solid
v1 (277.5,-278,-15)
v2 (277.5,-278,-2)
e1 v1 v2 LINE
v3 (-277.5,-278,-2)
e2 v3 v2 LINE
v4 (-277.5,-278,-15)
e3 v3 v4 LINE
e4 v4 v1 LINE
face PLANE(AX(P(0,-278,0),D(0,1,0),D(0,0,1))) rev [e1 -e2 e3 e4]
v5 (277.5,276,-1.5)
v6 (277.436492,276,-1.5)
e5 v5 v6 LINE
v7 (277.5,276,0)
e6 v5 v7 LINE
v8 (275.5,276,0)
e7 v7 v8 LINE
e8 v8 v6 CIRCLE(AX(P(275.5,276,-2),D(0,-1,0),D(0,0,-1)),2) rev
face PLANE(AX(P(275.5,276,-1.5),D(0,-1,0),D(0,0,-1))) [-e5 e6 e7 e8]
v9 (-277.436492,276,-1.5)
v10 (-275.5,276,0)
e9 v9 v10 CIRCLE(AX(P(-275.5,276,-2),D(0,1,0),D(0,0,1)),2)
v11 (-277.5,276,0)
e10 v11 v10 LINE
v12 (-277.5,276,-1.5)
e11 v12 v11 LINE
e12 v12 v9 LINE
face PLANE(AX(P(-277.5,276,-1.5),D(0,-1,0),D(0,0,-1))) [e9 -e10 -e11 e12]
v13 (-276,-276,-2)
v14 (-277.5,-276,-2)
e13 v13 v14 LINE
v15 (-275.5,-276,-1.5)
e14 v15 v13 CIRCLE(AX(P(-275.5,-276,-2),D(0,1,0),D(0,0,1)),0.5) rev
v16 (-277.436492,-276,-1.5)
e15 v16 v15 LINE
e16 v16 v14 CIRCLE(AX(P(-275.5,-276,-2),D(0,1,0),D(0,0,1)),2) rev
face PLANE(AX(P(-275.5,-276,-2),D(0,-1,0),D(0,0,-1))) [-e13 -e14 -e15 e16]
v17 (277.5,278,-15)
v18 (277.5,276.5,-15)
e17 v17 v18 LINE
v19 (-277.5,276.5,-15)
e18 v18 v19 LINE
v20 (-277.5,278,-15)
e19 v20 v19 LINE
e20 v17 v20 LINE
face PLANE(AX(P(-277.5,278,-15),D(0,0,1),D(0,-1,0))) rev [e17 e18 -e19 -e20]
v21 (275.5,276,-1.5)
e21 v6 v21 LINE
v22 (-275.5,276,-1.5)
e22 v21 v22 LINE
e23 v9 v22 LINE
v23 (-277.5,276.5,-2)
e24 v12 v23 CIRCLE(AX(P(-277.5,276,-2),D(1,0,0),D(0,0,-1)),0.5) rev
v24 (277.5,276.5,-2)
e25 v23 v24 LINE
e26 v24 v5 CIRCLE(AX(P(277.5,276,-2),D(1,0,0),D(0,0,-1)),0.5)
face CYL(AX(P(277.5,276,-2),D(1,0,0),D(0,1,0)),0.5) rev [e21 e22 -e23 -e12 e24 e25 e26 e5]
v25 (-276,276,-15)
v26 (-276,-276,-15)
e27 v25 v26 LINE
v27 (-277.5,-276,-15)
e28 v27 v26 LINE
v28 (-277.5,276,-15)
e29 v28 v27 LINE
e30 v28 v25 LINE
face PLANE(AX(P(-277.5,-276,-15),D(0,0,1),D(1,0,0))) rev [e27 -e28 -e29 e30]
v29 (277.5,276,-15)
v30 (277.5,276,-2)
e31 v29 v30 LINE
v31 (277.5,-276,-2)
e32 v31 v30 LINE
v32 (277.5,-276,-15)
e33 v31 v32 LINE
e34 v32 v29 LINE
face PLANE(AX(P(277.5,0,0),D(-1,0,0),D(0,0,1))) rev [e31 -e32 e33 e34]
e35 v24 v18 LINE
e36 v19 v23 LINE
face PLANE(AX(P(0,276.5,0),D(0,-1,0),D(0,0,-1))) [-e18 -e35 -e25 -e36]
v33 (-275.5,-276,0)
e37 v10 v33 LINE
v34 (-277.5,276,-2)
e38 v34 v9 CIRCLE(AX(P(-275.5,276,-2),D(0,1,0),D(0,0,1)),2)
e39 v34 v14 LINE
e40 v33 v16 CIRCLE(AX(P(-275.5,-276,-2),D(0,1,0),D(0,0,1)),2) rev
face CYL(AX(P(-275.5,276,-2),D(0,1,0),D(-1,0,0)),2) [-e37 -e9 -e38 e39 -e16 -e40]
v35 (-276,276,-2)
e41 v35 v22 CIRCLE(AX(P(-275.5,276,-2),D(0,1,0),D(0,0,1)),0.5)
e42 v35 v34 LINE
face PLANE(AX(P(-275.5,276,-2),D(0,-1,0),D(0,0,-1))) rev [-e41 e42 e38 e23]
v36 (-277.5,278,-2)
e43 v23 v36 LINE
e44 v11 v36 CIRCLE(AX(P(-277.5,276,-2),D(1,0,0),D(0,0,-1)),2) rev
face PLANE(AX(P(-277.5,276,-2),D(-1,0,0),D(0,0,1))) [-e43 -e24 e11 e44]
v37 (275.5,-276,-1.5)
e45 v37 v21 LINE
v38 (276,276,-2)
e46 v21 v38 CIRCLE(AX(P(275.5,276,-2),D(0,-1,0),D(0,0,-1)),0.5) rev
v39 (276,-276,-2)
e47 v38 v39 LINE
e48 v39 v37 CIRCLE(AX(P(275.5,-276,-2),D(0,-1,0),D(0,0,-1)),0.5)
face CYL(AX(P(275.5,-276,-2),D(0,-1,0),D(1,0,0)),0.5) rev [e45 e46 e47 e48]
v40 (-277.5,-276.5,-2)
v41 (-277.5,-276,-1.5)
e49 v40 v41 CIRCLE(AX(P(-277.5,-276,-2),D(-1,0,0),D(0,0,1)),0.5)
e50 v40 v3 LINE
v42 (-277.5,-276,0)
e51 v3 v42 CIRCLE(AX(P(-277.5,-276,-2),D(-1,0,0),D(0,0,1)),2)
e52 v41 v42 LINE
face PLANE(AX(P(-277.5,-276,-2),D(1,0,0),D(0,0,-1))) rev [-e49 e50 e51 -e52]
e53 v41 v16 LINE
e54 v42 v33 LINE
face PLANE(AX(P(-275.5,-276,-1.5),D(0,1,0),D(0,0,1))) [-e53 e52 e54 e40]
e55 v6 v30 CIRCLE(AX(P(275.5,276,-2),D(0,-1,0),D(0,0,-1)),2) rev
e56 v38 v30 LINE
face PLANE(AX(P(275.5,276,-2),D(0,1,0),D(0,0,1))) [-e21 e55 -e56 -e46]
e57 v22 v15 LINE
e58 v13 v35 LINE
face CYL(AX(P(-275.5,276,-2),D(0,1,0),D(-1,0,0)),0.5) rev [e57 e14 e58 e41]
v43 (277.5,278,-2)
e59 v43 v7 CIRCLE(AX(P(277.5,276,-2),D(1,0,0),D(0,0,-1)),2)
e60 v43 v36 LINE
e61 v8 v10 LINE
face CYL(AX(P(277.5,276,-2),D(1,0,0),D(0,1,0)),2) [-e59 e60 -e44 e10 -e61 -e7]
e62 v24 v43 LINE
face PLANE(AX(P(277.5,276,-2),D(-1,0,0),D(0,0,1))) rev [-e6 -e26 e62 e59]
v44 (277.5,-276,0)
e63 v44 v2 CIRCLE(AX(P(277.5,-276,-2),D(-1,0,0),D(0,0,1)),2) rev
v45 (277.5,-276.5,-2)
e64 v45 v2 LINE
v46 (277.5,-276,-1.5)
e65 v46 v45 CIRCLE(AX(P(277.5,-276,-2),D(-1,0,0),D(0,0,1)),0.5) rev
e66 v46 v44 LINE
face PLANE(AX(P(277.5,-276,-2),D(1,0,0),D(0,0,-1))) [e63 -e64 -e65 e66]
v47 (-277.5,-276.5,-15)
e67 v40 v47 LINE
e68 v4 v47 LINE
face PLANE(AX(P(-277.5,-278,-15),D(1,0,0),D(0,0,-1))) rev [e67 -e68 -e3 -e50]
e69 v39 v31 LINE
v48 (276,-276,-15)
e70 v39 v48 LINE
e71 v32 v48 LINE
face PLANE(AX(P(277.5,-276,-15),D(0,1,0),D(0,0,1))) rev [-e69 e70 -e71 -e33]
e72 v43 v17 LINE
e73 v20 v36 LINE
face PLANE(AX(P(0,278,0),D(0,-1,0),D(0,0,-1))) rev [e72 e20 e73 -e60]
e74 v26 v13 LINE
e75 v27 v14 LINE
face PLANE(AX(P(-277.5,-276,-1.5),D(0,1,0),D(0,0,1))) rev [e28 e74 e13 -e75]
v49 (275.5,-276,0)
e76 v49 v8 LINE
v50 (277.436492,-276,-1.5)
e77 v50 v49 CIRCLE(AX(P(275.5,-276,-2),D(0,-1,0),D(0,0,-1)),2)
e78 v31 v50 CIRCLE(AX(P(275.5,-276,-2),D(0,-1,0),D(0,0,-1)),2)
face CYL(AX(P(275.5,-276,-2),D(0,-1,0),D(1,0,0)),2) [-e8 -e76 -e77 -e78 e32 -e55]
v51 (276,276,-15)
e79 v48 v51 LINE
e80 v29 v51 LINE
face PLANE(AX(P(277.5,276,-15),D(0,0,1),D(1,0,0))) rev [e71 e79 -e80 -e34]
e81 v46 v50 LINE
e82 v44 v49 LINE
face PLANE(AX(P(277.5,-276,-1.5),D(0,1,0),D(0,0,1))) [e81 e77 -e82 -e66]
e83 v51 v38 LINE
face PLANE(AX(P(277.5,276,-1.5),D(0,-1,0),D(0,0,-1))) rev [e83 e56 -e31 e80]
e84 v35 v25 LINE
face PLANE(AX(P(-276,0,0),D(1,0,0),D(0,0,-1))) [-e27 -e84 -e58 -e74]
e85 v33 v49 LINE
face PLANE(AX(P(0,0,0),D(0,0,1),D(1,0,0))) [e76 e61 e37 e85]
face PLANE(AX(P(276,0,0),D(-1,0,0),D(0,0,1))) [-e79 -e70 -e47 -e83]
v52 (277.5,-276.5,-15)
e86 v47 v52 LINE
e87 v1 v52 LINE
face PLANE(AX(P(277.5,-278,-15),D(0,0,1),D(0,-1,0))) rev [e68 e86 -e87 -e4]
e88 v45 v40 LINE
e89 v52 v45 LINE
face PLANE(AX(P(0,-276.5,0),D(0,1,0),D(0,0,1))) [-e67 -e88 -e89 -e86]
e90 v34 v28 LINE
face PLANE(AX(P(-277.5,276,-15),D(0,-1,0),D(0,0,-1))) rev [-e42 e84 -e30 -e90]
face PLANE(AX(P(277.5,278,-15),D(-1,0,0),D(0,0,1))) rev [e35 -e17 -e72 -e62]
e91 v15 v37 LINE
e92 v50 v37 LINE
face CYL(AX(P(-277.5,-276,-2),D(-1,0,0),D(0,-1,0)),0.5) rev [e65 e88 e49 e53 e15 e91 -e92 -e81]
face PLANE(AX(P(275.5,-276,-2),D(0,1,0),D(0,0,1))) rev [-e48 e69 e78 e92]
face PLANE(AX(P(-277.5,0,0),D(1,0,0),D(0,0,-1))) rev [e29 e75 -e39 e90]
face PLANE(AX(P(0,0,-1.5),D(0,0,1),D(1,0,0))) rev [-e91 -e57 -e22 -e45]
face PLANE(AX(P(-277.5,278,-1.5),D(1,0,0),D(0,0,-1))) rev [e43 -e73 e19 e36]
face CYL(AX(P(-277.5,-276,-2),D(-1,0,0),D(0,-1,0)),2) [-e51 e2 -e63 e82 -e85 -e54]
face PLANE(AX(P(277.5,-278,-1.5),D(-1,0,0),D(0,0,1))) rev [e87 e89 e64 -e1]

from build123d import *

# Parameters (mm, degrees)
SKETCH_2_W                         = 555
SKETCH_2_H                         = 556
SM_BASE_FLANGE_1_DEPTH             = 1.5
SM_EDGE_FLANGE_2_STRIP_W           = 7
SM_EDGE_FLANGE_2_STRIP_H           = 1.5
SM_EDGE_FLANGE_2_STRIP_CUT_DEPTH   = 555
SM_EDGE_FLANGE_2_STRIP_2_W         = 7
SM_EDGE_FLANGE_2_STRIP_2_H         = 1.5
SM_EDGE_FLANGE_2_STRIP_CUT_2_DEPTH = 555
SM_EDGE_FLANGE_2_DEPTH             = 555
SM_EDGE_FLANGE_2_BEND_DEPTH        = 555
SM_EDGE_FLANGE_3_STRIP_W           = 7
SM_EDGE_FLANGE_3_STRIP_H           = 1.5
SM_EDGE_FLANGE_3_STRIP_CUT_DEPTH   = 552
SM_EDGE_FLANGE_3_STRIP_2_W         = 7
SM_EDGE_FLANGE_3_STRIP_2_H         = 1.5
SM_EDGE_FLANGE_3_STRIP_CUT_2_DEPTH = 552
SM_EDGE_FLANGE_3_DEPTH             = 552
SM_EDGE_FLANGE_3_BEND_DEPTH        = 552


# Sheet-metal steps are written as plain solids
with BuildPart() as part:
    # Sketch 2 → 基体-法兰1 (new body)
    with BuildSketch(Plane.XY):
        Rectangle(SKETCH_2_W, SKETCH_2_H)
    extrude(amount=-SM_BASE_FLANGE_1_DEPTH)

    # 边线-法兰2 strip (across the edge) → 边线-法兰2 strip cut (cut)
    with BuildSketch(Plane(origin=(-277.5, 278, -1.5), x_dir=(0, -1, 0), z_dir=(1, 0, 0))):
        with Locations((-1.5, -0.75)):
            Rectangle(SM_EDGE_FLANGE_2_STRIP_W, SM_EDGE_FLANGE_2_STRIP_H)
    extrude(amount=SM_EDGE_FLANGE_2_STRIP_CUT_DEPTH, mode=Mode.SUBTRACT)

    # 边线-法兰2 strip 2 (across the edge) → 边线-法兰2 strip cut 2 (cut)
    with BuildSketch(Plane(origin=(277.5, -278, -1.5), x_dir=(0, 1, 0), z_dir=(-1, 0, 0))):
        with Locations((-1.5, -0.75)):
            Rectangle(SM_EDGE_FLANGE_2_STRIP_2_W, SM_EDGE_FLANGE_2_STRIP_2_H)
    extrude(amount=SM_EDGE_FLANGE_2_STRIP_CUT_2_DEPTH, mode=Mode.SUBTRACT)

    # 边线-法兰2 section (across the edge) → 边线-法兰2 (add)
    with BuildSketch(Plane(origin=(-277.5, 278, -1.5), x_dir=(0, -1, 0), z_dir=(1, 0, 0))):
        with BuildLine():
            Line((0, 0.5), (0, 13.5))
            Line((0, 13.5), (1.5, 13.5))
            Line((1.5, 13.5), (1.5, 0.5))
            ThreePointArc((1.5, 0.5), (1.646446609, 0.146446609), (2, 0))
            Line((2, 0), (2, -1.5))
            ThreePointArc((2, -1.5), (0.585786438, -0.914213562), (0, 0.5))
        make_face()
    extrude(amount=SM_EDGE_FLANGE_2_DEPTH)

    # 边线-法兰2 section 2 (across the edge) → 边线-法兰2 bend (add)
    with BuildSketch(Plane(origin=(277.5, -278, -1.5), x_dir=(0, 1, 0), z_dir=(-1, 0, 0))):
        with BuildLine():
            Line((0, 0.5), (0, 13.5))
            Line((0, 13.5), (1.5, 13.5))
            Line((1.5, 13.5), (1.5, 0.5))
            ThreePointArc((1.5, 0.5), (1.646446609, 0.146446609), (2, 0))
            Line((2, 0), (2, -1.5))
            ThreePointArc((2, -1.5), (0.585786438, -0.914213562), (0, 0.5))
        make_face()
    extrude(amount=SM_EDGE_FLANGE_2_BEND_DEPTH)

    # 边线-法兰3 strip (across the edge) → 边线-法兰3 strip cut (cut)
    with BuildSketch(Plane(origin=(-277.5, -276, -1.5), x_dir=(1, 0, 0), z_dir=(0, 1, 0))):
        with Locations((-1.5, -0.75)):
            Rectangle(SM_EDGE_FLANGE_3_STRIP_W, SM_EDGE_FLANGE_3_STRIP_H)
    extrude(amount=SM_EDGE_FLANGE_3_STRIP_CUT_DEPTH, mode=Mode.SUBTRACT)

    # 边线-法兰3 strip 2 (across the edge) → 边线-法兰3 strip cut 2 (cut)
    with BuildSketch(Plane(origin=(277.5, 276, -1.5), x_dir=(-1, 0, 0), z_dir=(0, -1, 0))):
        with Locations((-1.5, -0.75)):
            Rectangle(SM_EDGE_FLANGE_3_STRIP_2_W, SM_EDGE_FLANGE_3_STRIP_2_H)
    extrude(amount=SM_EDGE_FLANGE_3_STRIP_CUT_2_DEPTH, mode=Mode.SUBTRACT)

    # 边线-法兰3 section (across the edge) → 边线-法兰3 (add)
    with BuildSketch(Plane(origin=(-277.5, -276, -1.5), x_dir=(1, 0, 0), z_dir=(0, 1, 0))):
        with BuildLine():
            Line((0, 0.5), (0, 13.5))
            Line((0, 13.5), (1.5, 13.5))
            Line((1.5, 13.5), (1.5, 0.5))
            ThreePointArc((1.5, 0.5), (1.646446609, 0.146446609), (2, 0))
            Line((2, 0), (2, -1.5))
            ThreePointArc((2, -1.5), (0.585786438, -0.914213562), (0, 0.5))
        make_face()
    extrude(amount=SM_EDGE_FLANGE_3_DEPTH)

    # 边线-法兰3 section 2 (across the edge) → 边线-法兰3 bend (add)
    with BuildSketch(Plane(origin=(277.5, 276, -1.5), x_dir=(-1, 0, 0), z_dir=(0, -1, 0))):
        with BuildLine():
            Line((0, 0.5), (0, 13.5))
            Line((0, 13.5), (1.5, 13.5))
            Line((1.5, 13.5), (1.5, 0.5))
            ThreePointArc((1.5, 0.5), (1.646446609, 0.146446609), (2, 0))
            Line((2, 0), (2, -1.5))
            ThreePointArc((2, -1.5), (0.585786438, -0.914213562), (0, 0.5))
        make_face()
    extrude(amount=SM_EDGE_FLANGE_3_BEND_DEPTH)


solid = part.part
